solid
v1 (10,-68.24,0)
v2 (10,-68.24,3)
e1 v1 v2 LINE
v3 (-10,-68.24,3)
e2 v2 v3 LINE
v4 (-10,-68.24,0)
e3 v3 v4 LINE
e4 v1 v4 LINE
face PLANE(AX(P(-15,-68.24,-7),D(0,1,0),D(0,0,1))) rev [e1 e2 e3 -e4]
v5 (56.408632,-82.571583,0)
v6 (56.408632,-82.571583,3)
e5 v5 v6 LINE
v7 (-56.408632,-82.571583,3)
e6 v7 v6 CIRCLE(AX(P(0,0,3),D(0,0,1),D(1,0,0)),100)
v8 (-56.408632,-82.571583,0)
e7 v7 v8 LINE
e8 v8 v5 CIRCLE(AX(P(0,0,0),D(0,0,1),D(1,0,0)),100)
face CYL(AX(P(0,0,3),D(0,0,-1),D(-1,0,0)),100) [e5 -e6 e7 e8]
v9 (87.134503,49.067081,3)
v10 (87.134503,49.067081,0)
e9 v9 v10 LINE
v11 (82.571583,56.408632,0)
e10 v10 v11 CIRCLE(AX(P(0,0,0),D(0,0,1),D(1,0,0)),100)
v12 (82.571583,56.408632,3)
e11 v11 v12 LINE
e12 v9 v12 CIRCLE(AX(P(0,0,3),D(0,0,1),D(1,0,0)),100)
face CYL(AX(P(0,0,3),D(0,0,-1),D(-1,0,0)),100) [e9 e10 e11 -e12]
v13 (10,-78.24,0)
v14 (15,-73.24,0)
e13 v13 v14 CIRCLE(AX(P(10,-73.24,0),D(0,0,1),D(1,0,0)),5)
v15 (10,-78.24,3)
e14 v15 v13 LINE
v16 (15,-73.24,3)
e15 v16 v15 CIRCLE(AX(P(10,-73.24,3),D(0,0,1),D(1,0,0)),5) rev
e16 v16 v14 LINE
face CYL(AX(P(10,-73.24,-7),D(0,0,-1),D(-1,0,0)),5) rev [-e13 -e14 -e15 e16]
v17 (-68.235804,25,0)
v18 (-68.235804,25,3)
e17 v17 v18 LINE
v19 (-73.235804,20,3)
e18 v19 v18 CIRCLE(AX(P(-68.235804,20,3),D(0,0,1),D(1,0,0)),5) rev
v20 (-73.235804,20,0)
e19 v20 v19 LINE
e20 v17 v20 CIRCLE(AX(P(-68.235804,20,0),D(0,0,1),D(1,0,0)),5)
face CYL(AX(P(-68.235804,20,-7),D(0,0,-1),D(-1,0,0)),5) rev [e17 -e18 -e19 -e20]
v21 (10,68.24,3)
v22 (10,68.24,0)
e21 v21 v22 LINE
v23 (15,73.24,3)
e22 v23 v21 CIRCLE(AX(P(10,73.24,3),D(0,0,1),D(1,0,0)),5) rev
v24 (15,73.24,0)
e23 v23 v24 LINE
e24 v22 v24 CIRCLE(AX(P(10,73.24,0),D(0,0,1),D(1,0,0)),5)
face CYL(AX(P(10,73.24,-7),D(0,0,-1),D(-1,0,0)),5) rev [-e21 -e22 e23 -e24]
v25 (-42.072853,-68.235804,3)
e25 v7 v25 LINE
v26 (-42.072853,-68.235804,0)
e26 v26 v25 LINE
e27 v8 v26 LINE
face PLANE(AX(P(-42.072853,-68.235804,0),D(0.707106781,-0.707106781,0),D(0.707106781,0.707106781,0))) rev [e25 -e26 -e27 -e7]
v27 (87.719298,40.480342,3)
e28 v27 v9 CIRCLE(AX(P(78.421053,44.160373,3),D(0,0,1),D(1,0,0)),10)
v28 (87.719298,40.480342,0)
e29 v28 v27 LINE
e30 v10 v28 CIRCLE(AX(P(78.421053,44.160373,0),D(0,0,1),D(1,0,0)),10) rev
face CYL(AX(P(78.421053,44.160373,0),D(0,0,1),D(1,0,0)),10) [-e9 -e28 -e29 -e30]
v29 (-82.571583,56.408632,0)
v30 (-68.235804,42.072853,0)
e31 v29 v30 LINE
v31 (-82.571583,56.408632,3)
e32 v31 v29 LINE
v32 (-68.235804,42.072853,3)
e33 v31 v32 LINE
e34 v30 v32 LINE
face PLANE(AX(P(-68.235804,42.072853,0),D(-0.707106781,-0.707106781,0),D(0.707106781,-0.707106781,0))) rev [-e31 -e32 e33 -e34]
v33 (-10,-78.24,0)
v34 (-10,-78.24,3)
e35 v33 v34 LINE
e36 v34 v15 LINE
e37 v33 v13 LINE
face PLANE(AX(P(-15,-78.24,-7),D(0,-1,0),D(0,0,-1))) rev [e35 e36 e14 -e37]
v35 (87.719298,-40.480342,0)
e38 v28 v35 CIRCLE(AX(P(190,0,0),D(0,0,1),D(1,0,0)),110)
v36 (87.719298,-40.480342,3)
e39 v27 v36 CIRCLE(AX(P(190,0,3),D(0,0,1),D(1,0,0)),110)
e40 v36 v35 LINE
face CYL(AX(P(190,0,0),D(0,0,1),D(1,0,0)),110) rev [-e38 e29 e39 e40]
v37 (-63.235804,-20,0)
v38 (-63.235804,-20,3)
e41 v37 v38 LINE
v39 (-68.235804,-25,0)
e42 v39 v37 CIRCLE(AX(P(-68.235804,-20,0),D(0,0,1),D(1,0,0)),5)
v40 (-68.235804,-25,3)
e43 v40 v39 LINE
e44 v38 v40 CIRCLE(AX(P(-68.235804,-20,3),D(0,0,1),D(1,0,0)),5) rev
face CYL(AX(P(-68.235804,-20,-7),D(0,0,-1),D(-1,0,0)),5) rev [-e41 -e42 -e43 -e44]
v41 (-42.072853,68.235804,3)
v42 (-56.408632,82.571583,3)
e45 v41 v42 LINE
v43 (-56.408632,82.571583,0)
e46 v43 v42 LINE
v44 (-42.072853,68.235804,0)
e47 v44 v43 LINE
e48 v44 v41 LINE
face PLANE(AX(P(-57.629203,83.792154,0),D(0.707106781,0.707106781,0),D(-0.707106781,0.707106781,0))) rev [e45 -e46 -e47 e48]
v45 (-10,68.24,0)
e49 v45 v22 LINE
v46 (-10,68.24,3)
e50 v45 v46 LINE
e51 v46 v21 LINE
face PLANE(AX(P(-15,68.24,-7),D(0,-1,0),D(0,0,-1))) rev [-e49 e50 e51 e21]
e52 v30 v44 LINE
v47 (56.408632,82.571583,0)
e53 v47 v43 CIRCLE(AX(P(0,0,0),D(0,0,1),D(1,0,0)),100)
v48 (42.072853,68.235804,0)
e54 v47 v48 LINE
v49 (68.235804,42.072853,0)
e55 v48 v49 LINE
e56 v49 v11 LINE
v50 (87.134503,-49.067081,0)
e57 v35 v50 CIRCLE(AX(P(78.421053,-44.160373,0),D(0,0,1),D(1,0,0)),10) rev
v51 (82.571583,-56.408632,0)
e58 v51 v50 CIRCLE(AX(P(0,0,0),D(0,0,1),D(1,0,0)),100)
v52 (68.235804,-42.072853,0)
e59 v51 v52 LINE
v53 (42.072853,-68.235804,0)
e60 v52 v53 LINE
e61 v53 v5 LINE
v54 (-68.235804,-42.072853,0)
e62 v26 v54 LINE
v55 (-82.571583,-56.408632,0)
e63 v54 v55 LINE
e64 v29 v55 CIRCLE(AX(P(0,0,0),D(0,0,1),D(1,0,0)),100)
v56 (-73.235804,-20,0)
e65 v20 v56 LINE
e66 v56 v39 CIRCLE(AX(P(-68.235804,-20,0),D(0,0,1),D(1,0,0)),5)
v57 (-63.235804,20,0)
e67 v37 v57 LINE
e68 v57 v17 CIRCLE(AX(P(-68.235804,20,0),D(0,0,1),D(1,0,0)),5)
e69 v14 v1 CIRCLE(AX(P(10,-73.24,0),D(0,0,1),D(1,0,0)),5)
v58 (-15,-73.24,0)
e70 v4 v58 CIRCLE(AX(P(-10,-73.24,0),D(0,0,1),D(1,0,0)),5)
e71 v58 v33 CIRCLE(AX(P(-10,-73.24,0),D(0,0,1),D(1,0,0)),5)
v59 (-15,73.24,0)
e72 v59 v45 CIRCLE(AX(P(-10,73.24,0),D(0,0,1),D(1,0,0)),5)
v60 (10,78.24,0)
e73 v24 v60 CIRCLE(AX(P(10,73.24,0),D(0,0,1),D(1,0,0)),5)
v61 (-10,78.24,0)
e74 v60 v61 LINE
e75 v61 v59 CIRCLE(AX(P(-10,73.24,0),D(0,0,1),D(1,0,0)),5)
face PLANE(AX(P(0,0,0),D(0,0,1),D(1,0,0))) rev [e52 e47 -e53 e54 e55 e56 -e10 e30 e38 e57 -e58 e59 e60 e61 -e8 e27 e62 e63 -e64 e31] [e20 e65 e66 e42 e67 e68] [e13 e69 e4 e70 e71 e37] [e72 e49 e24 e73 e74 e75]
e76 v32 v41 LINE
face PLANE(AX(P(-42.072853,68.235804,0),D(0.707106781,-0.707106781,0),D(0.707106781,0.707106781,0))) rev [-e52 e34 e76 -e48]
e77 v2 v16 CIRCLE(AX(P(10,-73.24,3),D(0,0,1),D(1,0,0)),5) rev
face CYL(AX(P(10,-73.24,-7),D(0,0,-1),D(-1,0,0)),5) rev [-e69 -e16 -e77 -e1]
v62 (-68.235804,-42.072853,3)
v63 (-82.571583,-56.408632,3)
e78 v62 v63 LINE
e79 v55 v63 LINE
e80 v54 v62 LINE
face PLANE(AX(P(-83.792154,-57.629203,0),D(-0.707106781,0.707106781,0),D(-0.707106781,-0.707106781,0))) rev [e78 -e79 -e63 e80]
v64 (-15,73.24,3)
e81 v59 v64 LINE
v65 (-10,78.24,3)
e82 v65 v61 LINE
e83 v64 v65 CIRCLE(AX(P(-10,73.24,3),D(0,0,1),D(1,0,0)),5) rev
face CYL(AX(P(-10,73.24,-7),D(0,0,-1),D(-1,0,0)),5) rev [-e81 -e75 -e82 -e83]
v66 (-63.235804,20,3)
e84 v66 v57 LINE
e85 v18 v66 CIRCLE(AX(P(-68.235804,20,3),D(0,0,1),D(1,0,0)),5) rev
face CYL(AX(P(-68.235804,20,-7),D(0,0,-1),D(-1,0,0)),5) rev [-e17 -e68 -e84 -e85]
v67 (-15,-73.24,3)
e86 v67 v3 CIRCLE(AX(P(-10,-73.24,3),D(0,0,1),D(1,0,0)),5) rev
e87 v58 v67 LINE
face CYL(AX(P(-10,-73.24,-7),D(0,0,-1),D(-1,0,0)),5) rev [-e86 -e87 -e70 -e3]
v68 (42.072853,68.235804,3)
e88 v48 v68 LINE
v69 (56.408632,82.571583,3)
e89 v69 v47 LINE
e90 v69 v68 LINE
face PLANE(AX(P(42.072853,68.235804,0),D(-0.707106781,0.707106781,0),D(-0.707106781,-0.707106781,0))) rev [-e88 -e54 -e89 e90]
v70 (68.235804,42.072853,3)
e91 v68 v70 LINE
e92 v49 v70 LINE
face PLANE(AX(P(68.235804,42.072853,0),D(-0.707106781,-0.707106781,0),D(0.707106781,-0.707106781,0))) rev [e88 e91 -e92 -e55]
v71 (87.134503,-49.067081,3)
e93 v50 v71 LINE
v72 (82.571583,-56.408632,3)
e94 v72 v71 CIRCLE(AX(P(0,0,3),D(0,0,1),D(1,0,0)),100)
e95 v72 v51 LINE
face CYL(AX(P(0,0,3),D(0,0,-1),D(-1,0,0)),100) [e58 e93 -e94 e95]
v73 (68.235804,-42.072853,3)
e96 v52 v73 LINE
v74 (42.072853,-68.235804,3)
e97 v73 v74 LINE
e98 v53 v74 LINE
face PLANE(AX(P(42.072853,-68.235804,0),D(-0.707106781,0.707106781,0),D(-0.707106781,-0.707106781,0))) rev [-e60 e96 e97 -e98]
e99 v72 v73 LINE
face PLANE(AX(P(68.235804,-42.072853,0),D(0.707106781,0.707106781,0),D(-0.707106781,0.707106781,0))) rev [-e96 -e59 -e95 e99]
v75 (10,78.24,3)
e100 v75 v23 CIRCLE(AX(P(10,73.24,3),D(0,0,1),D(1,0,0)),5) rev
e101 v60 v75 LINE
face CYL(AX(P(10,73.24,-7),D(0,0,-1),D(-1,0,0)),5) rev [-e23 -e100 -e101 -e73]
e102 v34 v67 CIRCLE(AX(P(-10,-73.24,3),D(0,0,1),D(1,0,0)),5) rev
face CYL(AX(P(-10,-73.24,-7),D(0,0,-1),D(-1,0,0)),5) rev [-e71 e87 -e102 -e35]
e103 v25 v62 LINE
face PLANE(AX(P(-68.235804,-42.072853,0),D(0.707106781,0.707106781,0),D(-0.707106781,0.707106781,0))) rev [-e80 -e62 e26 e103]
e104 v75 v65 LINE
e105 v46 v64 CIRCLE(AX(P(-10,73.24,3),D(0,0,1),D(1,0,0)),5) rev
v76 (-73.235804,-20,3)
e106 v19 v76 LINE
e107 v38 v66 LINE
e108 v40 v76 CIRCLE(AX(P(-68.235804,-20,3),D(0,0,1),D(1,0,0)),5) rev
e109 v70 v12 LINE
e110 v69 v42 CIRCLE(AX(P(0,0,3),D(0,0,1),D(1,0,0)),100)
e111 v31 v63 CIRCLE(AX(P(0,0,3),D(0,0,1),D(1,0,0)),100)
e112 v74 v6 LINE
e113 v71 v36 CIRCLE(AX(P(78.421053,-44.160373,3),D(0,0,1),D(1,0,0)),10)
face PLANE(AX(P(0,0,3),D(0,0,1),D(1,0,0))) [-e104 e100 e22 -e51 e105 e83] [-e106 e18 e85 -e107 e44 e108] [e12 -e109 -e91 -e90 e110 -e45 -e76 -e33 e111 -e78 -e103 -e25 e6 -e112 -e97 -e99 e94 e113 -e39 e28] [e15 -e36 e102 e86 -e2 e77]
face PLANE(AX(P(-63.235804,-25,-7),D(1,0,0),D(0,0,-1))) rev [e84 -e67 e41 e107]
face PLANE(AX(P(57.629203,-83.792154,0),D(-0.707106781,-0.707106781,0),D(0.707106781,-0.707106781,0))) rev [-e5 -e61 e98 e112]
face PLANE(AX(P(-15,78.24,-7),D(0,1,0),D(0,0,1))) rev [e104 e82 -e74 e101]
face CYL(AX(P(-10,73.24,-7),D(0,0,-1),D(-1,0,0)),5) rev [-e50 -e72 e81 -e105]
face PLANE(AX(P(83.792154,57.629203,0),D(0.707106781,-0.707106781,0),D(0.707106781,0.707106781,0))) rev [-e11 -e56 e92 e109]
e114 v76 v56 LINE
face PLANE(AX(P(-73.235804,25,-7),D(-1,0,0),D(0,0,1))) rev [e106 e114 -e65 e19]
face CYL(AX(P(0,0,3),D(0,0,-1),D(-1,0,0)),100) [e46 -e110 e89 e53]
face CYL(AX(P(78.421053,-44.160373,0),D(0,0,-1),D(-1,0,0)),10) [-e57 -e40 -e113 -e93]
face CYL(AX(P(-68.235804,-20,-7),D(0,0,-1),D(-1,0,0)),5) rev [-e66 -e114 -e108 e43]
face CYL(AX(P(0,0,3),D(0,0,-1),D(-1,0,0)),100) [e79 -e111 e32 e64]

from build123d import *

# Parameters (mm, degrees)
CROQUIS1_R              = 100
SALIENTE_EXTRUIR1_DEPTH = 3
CROQUIS3_R              = 110
CORTAR_EXTRUIR1_DEPTH   = 3
REDONDEO1_R             = 10
CORTAR_EXTRUIR2_DEPTH   = 142.453172607
CROQUIS6_W              = 10
CROQUIS6_H              = 50
CROQUIS6_W_2            = 30
CROQUIS6_H_2            = 10
CORTAR_EXTRUIR4_DEPTH   = 10
REDONDEO3_R             = 5


with BuildPart() as part:
    # Croquis1 → Saliente-Extruir1 (new body)
    with BuildSketch(Plane.XY):
        Circle(CROQUIS1_R)
    extrude(amount=SALIENTE_EXTRUIR1_DEPTH)

    # Croquis3 → Cortar-Extruir1 (cut)
    with BuildSketch(Plane.XY.offset(3)):
        with Locations((190, 0)):
            Circle(CROQUIS3_R)
    extrude(amount=-CORTAR_EXTRUIR1_DEPTH, mode=Mode.SUBTRACT)

    # Redondeo1
    redondeo1_edges = [part.edges().sort_by_distance(p)[0] for p in [
        (89.473684211, -44.659375654, 1.5),
        (89.473684211, 44.659375654, 1.5),
    ]]
    fillet(redondeo1_edges, radius=REDONDEO1_R)

    # Croquis4 → Cortar-Extruir2 (cut, through all)
    with BuildSketch(Plane.XY.offset(3)):
        Polygon((-57.629202667, -83.792153571), (-83.792153571, -57.629202667), (-68.235804385, -42.072853481), (-42.072853481, -68.235804385), align=None)
        Polygon((-57.629202667, 83.792153571), (-42.072853481, 68.235804385), (-68.235804385, 42.072853481), (-83.792153571, 57.629202667), align=None)
        Polygon((83.792153571, 57.629202667), (68.235804385, 42.072853481), (42.072853481, 68.235804385), (57.629202667, 83.792153571), align=None)
        Polygon((57.629202667, -83.792153571), (42.072853481, -68.235804385), (68.235804385, -42.072853481), (83.792153571, -57.629202667), align=None)
    extrude(amount=-CORTAR_EXTRUIR2_DEPTH, mode=Mode.SUBTRACT)

    # Croquis6 → Cortar-Extruir4 (cut)
    with BuildSketch(Plane.XY.offset(3)):
        with Locations((-68.235804385, 0)):
            Rectangle(CROQUIS6_W, CROQUIS6_H)
        with Locations((0, 73.24)):
            Rectangle(CROQUIS6_W_2, CROQUIS6_H_2)
        with Locations((0, -73.24)):
            Rectangle(CROQUIS6_W_2, CROQUIS6_H_2)
    extrude(amount=-CORTAR_EXTRUIR4_DEPTH, mode=Mode.SUBTRACT)

    # Redondeo3
    redondeo3_edges = [part.edges().sort_by_distance(p)[0] for p in [
        (15, -78.24, 1.5),
        (-15, -78.24, 1.5),
        (15, -68.24, 1.5),
        (-15, -68.24, 1.5),
        (-73.235804385, -25, 1.5),
        (-63.235804385, -25, 1.5),
        (-73.235804385, 25, 1.5),
        (-63.235804385, 25, 1.5),
        (-15, 68.24, 1.5),
        (15, 68.24, 1.5),
        (-15, 78.24, 1.5),
        (15, 78.24, 1.5),
    ]]
    fillet(redondeo3_edges, radius=REDONDEO3_R - 0.0001)  # a hair under: the kernel refuses the full size


solid = part.part
